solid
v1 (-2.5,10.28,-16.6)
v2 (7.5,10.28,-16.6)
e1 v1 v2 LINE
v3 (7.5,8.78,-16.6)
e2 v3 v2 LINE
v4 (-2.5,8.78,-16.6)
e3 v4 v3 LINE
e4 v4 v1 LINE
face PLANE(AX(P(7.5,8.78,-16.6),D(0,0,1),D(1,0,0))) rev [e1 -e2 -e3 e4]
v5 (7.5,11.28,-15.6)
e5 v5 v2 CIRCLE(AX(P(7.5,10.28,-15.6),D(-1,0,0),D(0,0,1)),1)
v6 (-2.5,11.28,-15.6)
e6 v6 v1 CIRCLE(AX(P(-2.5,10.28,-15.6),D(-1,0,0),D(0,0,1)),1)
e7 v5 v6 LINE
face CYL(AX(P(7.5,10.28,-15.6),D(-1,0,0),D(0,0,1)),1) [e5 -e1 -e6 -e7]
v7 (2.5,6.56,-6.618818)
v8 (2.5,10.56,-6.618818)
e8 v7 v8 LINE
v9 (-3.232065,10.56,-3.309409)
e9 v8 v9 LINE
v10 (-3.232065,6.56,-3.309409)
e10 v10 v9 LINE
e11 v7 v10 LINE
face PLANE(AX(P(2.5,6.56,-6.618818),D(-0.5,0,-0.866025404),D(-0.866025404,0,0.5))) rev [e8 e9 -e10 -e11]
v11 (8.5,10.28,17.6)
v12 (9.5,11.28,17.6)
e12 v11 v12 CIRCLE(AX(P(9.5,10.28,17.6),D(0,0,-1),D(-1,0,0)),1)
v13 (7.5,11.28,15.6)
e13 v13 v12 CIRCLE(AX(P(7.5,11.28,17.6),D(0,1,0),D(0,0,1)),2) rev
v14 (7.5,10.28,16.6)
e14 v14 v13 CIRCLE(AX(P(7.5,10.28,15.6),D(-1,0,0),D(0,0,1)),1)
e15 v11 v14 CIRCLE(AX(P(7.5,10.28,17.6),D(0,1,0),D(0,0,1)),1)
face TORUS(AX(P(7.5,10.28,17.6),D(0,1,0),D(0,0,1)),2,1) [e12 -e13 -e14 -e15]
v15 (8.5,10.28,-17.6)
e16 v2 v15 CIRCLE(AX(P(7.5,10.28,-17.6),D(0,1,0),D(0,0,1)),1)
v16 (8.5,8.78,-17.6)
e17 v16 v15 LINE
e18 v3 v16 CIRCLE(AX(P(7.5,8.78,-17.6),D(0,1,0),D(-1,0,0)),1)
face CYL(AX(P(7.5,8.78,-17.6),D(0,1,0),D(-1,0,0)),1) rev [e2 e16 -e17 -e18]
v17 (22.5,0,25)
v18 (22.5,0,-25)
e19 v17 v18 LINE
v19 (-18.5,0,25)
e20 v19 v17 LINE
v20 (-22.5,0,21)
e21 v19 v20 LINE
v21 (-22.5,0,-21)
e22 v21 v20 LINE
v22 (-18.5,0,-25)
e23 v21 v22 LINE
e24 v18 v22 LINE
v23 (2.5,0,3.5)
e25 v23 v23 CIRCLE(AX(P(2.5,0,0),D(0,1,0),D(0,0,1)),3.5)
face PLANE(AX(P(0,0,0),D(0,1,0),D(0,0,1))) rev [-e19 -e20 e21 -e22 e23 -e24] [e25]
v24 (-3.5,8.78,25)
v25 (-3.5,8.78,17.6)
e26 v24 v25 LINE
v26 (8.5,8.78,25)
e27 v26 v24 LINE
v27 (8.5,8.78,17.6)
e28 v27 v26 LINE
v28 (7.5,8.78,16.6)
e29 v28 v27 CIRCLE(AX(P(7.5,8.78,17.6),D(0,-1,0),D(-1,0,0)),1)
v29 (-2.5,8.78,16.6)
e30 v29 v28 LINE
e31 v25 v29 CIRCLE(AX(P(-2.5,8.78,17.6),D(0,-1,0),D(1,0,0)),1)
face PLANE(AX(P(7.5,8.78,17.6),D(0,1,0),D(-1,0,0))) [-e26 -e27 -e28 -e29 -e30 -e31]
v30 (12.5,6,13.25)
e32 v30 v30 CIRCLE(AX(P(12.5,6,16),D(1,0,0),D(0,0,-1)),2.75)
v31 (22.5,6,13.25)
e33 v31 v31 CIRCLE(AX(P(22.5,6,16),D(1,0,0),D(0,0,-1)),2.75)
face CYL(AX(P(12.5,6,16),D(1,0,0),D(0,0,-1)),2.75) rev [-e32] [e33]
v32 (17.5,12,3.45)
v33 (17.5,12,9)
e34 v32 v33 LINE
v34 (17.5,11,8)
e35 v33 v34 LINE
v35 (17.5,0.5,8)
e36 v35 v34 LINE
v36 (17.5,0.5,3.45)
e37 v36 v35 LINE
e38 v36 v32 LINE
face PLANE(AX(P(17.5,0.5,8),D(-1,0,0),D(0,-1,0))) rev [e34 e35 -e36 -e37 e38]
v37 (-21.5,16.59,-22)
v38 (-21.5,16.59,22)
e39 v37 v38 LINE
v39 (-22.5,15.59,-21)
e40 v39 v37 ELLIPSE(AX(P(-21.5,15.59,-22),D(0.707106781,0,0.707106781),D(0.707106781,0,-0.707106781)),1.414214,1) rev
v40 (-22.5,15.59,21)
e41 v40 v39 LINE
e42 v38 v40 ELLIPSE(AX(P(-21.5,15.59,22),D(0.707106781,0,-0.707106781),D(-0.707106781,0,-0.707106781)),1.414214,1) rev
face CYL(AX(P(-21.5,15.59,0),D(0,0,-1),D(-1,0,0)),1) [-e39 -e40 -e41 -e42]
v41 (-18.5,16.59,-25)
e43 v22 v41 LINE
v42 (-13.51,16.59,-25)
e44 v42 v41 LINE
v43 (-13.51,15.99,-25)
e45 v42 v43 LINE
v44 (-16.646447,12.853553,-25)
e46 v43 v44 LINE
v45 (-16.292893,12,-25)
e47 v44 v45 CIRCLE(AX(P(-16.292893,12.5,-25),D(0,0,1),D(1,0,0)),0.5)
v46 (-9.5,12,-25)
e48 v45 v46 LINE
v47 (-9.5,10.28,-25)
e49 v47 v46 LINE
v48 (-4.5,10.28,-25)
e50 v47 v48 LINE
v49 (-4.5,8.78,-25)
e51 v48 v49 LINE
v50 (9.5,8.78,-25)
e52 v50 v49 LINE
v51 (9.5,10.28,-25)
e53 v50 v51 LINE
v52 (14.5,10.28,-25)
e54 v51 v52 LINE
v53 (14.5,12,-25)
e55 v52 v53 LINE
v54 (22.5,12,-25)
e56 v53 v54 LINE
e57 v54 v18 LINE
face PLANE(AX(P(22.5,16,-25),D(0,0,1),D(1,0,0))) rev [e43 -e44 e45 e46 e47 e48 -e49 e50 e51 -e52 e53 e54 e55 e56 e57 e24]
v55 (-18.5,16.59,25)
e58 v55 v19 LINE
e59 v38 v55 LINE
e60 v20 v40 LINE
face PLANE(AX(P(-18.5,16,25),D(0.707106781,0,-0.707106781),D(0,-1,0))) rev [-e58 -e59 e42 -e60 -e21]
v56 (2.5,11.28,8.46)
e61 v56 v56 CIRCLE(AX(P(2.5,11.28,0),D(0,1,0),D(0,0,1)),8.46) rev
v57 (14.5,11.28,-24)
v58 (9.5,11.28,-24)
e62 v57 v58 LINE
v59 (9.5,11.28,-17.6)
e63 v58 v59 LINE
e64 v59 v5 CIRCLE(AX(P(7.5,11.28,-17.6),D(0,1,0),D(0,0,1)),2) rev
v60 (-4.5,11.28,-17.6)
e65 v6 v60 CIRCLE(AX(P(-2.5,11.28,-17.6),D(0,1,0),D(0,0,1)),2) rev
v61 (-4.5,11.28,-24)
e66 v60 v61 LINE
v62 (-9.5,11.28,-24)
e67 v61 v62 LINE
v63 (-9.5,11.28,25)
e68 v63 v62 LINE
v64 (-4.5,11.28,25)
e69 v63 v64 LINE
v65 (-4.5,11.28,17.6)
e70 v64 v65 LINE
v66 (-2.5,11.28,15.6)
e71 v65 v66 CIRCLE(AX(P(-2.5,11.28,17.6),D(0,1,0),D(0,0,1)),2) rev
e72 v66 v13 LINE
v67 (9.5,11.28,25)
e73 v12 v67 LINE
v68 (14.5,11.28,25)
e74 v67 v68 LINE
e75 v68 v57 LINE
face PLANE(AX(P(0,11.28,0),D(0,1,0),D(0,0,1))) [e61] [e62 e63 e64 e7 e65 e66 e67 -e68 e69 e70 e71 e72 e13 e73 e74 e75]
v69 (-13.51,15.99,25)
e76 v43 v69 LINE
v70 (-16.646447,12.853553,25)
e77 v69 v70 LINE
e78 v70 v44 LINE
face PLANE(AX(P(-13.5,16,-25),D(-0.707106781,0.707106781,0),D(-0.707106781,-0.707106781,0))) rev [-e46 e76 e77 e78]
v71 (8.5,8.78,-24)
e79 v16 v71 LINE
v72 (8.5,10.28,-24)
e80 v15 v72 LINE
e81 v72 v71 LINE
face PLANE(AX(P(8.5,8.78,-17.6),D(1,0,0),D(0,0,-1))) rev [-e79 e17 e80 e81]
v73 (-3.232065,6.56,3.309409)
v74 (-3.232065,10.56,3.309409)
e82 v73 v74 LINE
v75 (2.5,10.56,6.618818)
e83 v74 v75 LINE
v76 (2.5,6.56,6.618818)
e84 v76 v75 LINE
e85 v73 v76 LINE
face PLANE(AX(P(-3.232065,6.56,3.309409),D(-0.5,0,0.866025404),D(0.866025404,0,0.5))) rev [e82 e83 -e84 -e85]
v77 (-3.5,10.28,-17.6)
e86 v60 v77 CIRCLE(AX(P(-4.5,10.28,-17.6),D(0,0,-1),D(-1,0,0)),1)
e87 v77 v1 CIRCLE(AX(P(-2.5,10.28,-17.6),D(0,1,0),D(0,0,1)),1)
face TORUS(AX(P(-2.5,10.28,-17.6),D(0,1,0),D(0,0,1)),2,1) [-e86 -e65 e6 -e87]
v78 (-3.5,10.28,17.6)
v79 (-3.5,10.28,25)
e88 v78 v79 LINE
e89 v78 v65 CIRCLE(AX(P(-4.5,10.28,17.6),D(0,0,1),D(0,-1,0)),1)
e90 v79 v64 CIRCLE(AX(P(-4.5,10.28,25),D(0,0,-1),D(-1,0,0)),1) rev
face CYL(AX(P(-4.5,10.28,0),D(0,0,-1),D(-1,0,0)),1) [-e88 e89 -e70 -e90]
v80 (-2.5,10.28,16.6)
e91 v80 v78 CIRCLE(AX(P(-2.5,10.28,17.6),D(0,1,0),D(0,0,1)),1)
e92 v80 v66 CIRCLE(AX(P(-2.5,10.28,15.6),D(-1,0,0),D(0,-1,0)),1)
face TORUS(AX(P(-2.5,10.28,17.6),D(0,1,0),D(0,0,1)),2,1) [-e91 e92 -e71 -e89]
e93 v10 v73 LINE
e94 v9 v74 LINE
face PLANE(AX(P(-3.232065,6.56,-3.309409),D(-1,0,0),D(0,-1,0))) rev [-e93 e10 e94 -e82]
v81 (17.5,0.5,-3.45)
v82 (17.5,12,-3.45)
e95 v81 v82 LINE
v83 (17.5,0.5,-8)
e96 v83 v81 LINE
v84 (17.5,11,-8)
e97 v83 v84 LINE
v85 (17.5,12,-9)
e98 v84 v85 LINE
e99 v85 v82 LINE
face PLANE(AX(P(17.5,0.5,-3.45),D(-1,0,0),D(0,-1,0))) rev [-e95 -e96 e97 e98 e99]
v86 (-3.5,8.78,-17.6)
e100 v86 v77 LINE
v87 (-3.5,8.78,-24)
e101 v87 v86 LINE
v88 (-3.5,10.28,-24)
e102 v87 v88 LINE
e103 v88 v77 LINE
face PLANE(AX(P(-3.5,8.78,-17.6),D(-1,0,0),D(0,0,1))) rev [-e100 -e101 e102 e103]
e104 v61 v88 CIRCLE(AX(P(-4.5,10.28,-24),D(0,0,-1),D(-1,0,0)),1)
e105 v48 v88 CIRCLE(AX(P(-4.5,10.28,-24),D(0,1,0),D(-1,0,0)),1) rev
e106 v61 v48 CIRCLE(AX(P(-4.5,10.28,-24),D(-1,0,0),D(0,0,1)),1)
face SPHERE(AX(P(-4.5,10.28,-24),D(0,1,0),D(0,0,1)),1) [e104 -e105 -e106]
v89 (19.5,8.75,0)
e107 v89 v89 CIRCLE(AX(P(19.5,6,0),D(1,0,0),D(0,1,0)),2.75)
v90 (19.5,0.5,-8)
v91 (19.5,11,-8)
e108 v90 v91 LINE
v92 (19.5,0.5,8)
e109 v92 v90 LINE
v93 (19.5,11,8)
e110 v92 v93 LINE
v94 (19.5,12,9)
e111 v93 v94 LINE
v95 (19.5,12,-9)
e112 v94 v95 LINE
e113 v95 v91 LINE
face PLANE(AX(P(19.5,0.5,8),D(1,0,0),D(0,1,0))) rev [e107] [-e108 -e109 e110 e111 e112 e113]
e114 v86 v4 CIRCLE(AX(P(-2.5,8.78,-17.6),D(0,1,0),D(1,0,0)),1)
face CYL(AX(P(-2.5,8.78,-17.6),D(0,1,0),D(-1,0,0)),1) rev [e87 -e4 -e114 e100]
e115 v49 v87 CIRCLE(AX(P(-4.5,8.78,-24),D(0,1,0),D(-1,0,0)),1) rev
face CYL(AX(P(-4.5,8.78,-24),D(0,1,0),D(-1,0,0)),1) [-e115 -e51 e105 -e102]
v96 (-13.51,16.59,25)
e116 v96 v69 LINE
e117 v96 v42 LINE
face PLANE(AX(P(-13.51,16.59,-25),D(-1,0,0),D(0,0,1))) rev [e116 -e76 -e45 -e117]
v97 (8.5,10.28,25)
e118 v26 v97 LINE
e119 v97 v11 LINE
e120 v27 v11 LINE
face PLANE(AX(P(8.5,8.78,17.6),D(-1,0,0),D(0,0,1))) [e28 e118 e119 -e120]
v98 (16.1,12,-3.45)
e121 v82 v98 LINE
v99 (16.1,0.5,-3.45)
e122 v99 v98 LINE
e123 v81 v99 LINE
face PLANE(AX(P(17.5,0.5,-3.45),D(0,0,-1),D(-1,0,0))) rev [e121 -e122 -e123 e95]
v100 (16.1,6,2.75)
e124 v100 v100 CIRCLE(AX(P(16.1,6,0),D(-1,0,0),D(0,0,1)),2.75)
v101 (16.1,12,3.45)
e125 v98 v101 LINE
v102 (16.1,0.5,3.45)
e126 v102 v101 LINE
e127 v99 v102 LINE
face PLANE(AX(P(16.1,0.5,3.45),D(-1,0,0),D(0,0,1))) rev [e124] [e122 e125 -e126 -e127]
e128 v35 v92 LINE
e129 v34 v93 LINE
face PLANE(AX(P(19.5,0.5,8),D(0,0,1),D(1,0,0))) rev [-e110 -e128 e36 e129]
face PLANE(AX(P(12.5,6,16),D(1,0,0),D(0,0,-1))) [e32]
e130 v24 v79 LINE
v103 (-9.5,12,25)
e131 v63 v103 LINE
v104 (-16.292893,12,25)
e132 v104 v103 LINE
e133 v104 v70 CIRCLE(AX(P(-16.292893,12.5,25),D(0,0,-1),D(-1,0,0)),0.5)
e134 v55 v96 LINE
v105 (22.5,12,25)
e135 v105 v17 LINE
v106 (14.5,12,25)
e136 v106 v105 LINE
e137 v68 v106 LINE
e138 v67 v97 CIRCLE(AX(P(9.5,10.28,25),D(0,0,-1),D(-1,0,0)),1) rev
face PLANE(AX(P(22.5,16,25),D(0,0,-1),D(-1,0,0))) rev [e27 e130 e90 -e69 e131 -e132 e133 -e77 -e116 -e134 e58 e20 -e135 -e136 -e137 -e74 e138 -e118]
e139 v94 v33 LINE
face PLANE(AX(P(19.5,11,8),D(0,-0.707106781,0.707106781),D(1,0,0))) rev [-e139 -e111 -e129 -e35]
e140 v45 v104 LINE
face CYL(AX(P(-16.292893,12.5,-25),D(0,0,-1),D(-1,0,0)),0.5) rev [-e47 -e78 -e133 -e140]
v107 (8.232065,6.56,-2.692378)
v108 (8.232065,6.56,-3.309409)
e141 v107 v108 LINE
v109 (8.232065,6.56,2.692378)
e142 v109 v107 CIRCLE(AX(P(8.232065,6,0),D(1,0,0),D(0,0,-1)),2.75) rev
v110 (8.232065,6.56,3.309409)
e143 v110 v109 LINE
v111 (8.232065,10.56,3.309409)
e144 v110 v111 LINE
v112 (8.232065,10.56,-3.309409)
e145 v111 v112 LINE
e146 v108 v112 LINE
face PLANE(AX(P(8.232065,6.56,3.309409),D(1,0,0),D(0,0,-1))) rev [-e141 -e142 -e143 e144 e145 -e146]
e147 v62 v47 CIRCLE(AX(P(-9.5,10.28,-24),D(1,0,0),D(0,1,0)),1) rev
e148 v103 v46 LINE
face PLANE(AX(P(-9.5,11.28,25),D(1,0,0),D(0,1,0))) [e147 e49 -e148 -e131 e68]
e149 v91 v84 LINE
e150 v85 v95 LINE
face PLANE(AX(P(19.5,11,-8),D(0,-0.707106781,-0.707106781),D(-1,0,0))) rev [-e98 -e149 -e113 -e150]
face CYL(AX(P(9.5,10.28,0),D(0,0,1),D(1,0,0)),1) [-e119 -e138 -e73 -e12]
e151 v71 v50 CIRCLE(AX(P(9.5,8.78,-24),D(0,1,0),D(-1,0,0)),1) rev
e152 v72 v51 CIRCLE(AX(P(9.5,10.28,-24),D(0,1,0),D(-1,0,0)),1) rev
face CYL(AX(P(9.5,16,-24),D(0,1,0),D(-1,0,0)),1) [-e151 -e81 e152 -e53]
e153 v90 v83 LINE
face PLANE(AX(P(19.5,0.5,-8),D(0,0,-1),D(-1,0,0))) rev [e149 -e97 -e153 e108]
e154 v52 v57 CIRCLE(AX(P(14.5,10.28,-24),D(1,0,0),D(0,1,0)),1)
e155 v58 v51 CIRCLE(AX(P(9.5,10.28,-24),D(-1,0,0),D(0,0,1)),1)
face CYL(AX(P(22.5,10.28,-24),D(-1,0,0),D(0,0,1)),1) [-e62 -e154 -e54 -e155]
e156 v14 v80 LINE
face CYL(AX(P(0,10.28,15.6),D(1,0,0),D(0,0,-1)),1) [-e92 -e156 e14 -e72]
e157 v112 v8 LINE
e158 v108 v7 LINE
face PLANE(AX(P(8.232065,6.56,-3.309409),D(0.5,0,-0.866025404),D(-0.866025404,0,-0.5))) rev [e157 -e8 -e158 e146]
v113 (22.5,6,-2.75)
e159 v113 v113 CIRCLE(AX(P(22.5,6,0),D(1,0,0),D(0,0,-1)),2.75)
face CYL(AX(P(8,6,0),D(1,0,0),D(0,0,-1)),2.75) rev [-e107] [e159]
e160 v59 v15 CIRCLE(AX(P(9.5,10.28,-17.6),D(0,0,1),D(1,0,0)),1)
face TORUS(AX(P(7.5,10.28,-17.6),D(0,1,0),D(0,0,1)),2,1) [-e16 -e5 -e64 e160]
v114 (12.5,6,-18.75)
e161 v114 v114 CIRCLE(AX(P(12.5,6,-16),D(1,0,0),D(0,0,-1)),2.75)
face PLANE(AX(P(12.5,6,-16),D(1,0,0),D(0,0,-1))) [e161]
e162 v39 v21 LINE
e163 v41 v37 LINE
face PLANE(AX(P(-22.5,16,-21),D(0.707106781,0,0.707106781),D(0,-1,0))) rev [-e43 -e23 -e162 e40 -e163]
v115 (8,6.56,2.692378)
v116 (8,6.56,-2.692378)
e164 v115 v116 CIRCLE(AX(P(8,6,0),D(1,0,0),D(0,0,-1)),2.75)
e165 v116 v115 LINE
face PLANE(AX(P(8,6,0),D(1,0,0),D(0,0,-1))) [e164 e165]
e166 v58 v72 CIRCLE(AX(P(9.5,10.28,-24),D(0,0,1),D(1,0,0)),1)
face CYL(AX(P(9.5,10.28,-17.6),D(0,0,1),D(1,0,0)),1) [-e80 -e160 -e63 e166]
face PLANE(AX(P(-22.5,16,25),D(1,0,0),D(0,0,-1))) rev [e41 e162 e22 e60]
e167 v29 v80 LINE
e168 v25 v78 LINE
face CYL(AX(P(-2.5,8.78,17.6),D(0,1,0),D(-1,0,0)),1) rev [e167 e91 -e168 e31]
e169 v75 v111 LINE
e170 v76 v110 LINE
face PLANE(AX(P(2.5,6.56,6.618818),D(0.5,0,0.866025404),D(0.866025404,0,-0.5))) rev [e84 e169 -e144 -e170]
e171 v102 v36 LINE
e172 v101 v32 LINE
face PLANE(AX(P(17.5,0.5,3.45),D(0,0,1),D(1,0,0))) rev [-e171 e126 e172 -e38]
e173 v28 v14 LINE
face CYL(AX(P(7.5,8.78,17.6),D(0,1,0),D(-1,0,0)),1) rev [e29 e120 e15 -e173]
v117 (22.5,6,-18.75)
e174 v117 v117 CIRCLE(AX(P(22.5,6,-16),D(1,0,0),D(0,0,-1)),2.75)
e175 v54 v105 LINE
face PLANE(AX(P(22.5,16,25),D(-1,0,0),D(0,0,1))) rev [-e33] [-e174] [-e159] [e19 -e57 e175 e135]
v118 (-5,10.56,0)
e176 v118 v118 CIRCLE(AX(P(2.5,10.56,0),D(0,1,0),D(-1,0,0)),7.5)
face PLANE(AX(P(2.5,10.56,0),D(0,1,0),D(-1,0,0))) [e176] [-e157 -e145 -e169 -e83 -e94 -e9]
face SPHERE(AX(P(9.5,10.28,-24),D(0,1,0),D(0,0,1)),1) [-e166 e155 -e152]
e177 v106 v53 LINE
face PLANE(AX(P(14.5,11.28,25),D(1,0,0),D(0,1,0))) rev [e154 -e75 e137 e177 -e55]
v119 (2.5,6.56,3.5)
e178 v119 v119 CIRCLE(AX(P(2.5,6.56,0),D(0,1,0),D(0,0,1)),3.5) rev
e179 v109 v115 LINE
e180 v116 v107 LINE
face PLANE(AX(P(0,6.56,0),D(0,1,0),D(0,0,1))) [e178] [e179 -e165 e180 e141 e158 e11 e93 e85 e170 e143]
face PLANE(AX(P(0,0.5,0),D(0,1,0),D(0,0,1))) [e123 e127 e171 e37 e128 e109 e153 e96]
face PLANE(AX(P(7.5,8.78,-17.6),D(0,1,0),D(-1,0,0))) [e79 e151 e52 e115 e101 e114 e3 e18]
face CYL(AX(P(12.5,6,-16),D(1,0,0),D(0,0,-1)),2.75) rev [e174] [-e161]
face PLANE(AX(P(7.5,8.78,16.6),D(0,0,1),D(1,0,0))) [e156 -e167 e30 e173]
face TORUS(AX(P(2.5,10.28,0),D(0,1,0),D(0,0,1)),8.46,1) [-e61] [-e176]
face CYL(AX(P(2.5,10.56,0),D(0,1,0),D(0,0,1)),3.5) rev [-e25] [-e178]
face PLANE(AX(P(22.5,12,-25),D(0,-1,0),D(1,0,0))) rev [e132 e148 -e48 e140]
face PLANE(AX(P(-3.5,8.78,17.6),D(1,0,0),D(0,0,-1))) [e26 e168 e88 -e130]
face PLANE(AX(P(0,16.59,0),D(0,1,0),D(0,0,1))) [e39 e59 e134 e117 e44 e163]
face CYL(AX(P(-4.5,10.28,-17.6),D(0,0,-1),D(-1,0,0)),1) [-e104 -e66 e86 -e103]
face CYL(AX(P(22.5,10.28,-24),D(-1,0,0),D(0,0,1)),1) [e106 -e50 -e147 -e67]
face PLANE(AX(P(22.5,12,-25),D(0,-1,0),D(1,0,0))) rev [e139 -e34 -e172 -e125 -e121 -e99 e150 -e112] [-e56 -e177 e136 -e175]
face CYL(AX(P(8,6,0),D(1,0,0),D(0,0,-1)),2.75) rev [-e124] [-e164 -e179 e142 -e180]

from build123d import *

# Parameters (mm, degrees)
SKETCH1_W            = 45
SKETCH1_H            = 50
BOSS_EXTRUDE1_DEPTH  = 16
CUT_EXTRUDE1_DEPTH   = 58.116109812
SKETCH4_W            = 24
SKETCH4_H            = 50
CUT_EXTRUDE2_DEPTH   = 0.72
CUT_EXTRUDE3_DEPTH   = 58.116109812
SKETCH8_R            = 7.5
CUT_EXTRUDE4_DEPTH   = 0.72
M6_CLEARANCE_HOLE2_D = 7
CUT_EXTRUDE5_DEPTH   = 2.5
FILLET1_R            = 1
FILLET2_R            = 1
FILLET4_R            = 0.5
CUT_EXTRUDE7_DEPTH   = 11.5
SKETCH18_R           = 2.75
CUT_EXTRUDE8_DEPTH   = 14.5
SKETCH19_R           = 2.75
CUT_EXTRUDE9_DEPTH   = 10
SKETCH21_W           = 8.99
SKETCH21_H           = 50
BOSS_EXTRUDE2_DEPTH  = 0.6
CHAMFER1_SIZE        = 4
FILLET5_R            = 1
CUT_EXTRUDE11_DEPTH  = 4
CHAMFER2_SIZE        = 1


with BuildPart() as part:
    # Sketch1 → Boss-Extrude1 (new body)
    with BuildSketch(Plane(origin=(0, 0, 0), x_dir=(1, 0, 0), z_dir=(0, 1, 0))):
        Rectangle(SKETCH1_W, SKETCH1_H)
    extrude(amount=BOSS_EXTRUDE1_DEPTH)

    # Sketch3 → Cut-Extrude1 (cut, through all)
    with BuildSketch(Plane.XY.offset(25)):
        Polygon((-13.5, 16), (-17.5, 12), (22.5, 12), (22.5, 16), align=None)
    extrude(amount=-CUT_EXTRUDE1_DEPTH, mode=Mode.SUBTRACT)

    # Sketch4 → Cut-Extrude2 (cut)
    with BuildSketch(Plane(origin=(0, 12, 0), x_dir=(1, 0, 0), z_dir=(0, 1, 0))):
        with Locations((2.5, 0)):
            Rectangle(SKETCH4_W, SKETCH4_H)
    extrude(amount=-CUT_EXTRUDE2_DEPTH, mode=Mode.SUBTRACT)

    # Sketch5 → Cut-Extrude3 (cut, through all)
    with BuildSketch(Plane.XY.offset(25)):
        Polygon((-22.5, 16), (-13.5, 16), (-13.51, 15.99), (-22.5, 15.99), align=None)
    extrude(amount=-CUT_EXTRUDE3_DEPTH, mode=Mode.SUBTRACT)

    # Sketch8 → Cut-Extrude4 (cut)
    with BuildSketch(Plane(origin=(0, 11.28, 0), x_dir=(1, 0, 0), z_dir=(0, 1, 0))):
        with Locations(Location((2.5, 0, 0), (0, 0, 180))):
            Circle(SKETCH8_R)
    extrude(amount=-CUT_EXTRUDE4_DEPTH, mode=Mode.SUBTRACT)

    # M6 Clearance Hole2 (through all)
    with Locations(Plane(origin=(0, 10.56, 0), x_dir=(1, 0, 0), z_dir=(0, 1, 0))):
        with Locations((2.5, 0)):
            Hole(M6_CLEARANCE_HOLE2_D / 2)

    # Sketch12 → Cut-Extrude5 (cut)
    with BuildSketch(Plane(origin=(0, 11.28, 0), x_dir=(1, 0, 0), z_dir=(0, 1, 0))):
        with BuildLine():
            Line((7.5, 16.6), (-2.5, 16.6))
            ThreePointArc((-2.5, 16.6), (-3.207106781, 16.892893219), (-3.5, 17.6))
            Line((-3.5, 17.6), (-3.5, 25))
            Line((-3.5, 25), (8.5, 25))
            Line((8.5, 25), (8.5, 17.6))
            ThreePointArc((8.5, 17.6), (8.207106781, 16.892893219), (7.5, 16.6))
        make_face()
    cut_extrude5 = extrude(amount=-CUT_EXTRUDE5_DEPTH, mode=Mode.SUBTRACT)

    # Fillet1
    fillet1_edges = [part.edges().sort_by_distance(p)[0] for p in [
        (-3.5, 10.03, -25),
        (8.5, 10.03, -25),
    ]]
    fillet(fillet1_edges, radius=FILLET1_R)

    # Mirror2: Cut-Extrude5 across plane
    add(cut_extrude5.mirror(Plane.XY), mode=Mode.SUBTRACT)

    # Fillet2
    # the kernel refuses this fillet: 1 mm, written as the material it takes off along each edge
    with BuildSketch(Plane(origin=(7.5, 11.28, 17.6), x_dir=(1, 0, 0), z_dir=(0, 0, 1))) as fillet2_piece_1:
        with BuildLine():
            CenterArc((1 + FILLET2_R, -FILLET2_R), FILLET2_R, 90, 90)
            Line((1, -FILLET2_R), (1 - FILLET2_R * 0.02, -FILLET2_R))
            Line((1 - FILLET2_R * 0.02, -FILLET2_R), (1 - FILLET2_R * 0.02, FILLET2_R * 0.02))
            Line((1 - FILLET2_R * 0.02, FILLET2_R * 0.02), (1 + FILLET2_R, FILLET2_R * 0.02))
            Line((1 + FILLET2_R, FILLET2_R * 0.02), (1 + FILLET2_R, 0))
        make_face()
    revolve(axis=Axis((7.5, 11.28, 17.6), (0, 1, 0)), revolution_arc=90, mode=Mode.SUBTRACT)
    with BuildSketch(Plane(origin=(8.5, 11.28, 27.5), x_dir=(1, 0, 0), z_dir=(0, 0, -1)), Plane(origin=(-3.5, 11.28, 17.6), x_dir=(-1, 0, 0), z_dir=(0, 0, 1))) as fillet2_piece_2:
        with BuildLine():
            CenterArc((FILLET2_R, FILLET2_R), FILLET2_R, 180, 90)
            Line((0, FILLET2_R), (-FILLET2_R * 0.02, FILLET2_R))
            Line((-FILLET2_R * 0.02, FILLET2_R), (-FILLET2_R * 0.02, -FILLET2_R * 0.02))
            Line((-FILLET2_R * 0.02, -FILLET2_R * 0.02), (FILLET2_R, -FILLET2_R * 0.02))
            Line((FILLET2_R, -FILLET2_R * 0.02), (FILLET2_R, 0))
        make_face()
    extrude(amount=9.9, mode=Mode.SUBTRACT)
    with BuildSketch(Plane(origin=(-2.5, 11.28, 17.6), x_dir=(0, 0, -1), z_dir=(1, 0, 0))) as fillet2_piece_3:
        with BuildLine():
            CenterArc((1 + FILLET2_R, -FILLET2_R), FILLET2_R, 90, 90)
            Line((1, -FILLET2_R), (1 - FILLET2_R * 0.02, -FILLET2_R))
            Line((1 - FILLET2_R * 0.02, -FILLET2_R), (1 - FILLET2_R * 0.02, FILLET2_R * 0.02))
            Line((1 - FILLET2_R * 0.02, FILLET2_R * 0.02), (1 + FILLET2_R, FILLET2_R * 0.02))
            Line((1 + FILLET2_R, FILLET2_R * 0.02), (1 + FILLET2_R, 0))
        make_face()
    revolve(axis=Axis((-2.5, 11.28, 17.6), (0, 1, 0)), revolution_arc=90, mode=Mode.SUBTRACT)
    with BuildSketch(Plane(origin=(7.5, 11.28, 16.6), x_dir=(0, 0, -1), z_dir=(-1, 0, 0))) as fillet2_piece_4:
        with BuildLine():
            CenterArc((FILLET2_R, FILLET2_R), FILLET2_R, 180, 90)
            Line((0, FILLET2_R), (-FILLET2_R * 0.02, FILLET2_R))
            Line((-FILLET2_R * 0.02, FILLET2_R), (-FILLET2_R * 0.02, -FILLET2_R * 0.02))
            Line((-FILLET2_R * 0.02, -FILLET2_R * 0.02), (FILLET2_R, -FILLET2_R * 0.02))
            Line((FILLET2_R, -FILLET2_R * 0.02), (FILLET2_R, 0))
        make_face()
    extrude(amount=10, mode=Mode.SUBTRACT)
    with BuildSketch(Plane(origin=(-4.5, 11.28, -25), x_dir=(0, 0, 1), z_dir=(-1, 0, 0)), Plane(origin=(14.5, 11.28, -25), x_dir=(0, 0, 1), z_dir=(-1, 0, 0))) as fillet2_piece_5:
        with BuildLine():
            CenterArc((FILLET2_R, -FILLET2_R), FILLET2_R, 90, 90)
            Line((0, -FILLET2_R), (-FILLET2_R * 0.02, -FILLET2_R))
            Line((-FILLET2_R * 0.02, -FILLET2_R), (-FILLET2_R * 0.02, FILLET2_R * 0.02))
            Line((-FILLET2_R * 0.02, FILLET2_R * 0.02), (FILLET2_R, FILLET2_R * 0.02))
            Line((FILLET2_R, FILLET2_R * 0.02), (FILLET2_R, 0))
        make_face()
    extrude(amount=5, mode=Mode.SUBTRACT)
    with BuildSketch(Plane(origin=(2.5, 11.28, 0), x_dir=(-1, 0, 0), z_dir=(0, 0, -1))) as fillet2_piece_6:
        with BuildLine():
            CenterArc((8.46, -1), FILLET2_R, 90, 73.739795292)
            Line((7.5, -0.72), (7.4808, -0.7144))
            ThreePointArc((7.4808, -0.7144), (7.48, -0.36), (7.48, 0))
            Line((7.48, 0), (7.5, 0.02))
            Line((7.5, 0.02), (8.46, 0.02))
            Line((8.46, 0.02), (8.46, 0))
        make_face()
    revolve(axis=Axis((2.5, 11.28, 0), (0, 1, 0)), mode=Mode.SUBTRACT)
    with BuildSketch(Plane(origin=(7.5, 11.28, -17.6), x_dir=(1, 0, 0), z_dir=(0, 0, -1))) as fillet2_piece_7:
        with BuildLine():
            CenterArc((1 + FILLET2_R, FILLET2_R), FILLET2_R, 180, 90)
            Line((1, FILLET2_R), (1 - FILLET2_R * 0.02, FILLET2_R))
            Line((1 - FILLET2_R * 0.02, FILLET2_R), (1 - FILLET2_R * 0.02, -FILLET2_R * 0.02))
            Line((1 - FILLET2_R * 0.02, -FILLET2_R * 0.02), (1 + FILLET2_R, -FILLET2_R * 0.02))
            Line((1 + FILLET2_R, -FILLET2_R * 0.02), (1 + FILLET2_R, 0))
        make_face()
    revolve(axis=Axis((7.5, 11.28, -17.6), (0, -1, 0)), revolution_arc=90, mode=Mode.SUBTRACT)
    with BuildSketch(Plane(origin=(8.5, 11.28, -24), x_dir=(1, 0, 0), z_dir=(0, 0, 1)), Plane(origin=(-3.5, 11.28, -17.6), x_dir=(-1, 0, 0), z_dir=(0, 0, -1))) as fillet2_piece_8:
        with BuildLine():
            CenterArc((FILLET2_R, -FILLET2_R), FILLET2_R, 90, 90)
            Line((0, -FILLET2_R), (-FILLET2_R * 0.02, -FILLET2_R))
            Line((-FILLET2_R * 0.02, -FILLET2_R), (-FILLET2_R * 0.02, FILLET2_R * 0.02))
            Line((-FILLET2_R * 0.02, FILLET2_R * 0.02), (FILLET2_R, FILLET2_R * 0.02))
            Line((FILLET2_R, FILLET2_R * 0.02), (FILLET2_R, 0))
        make_face()
    extrude(amount=6.4, mode=Mode.SUBTRACT)
    with BuildSketch(Plane(origin=(-2.5, 11.28, -17.6), x_dir=(0, 0, 1), z_dir=(1, 0, 0))) as fillet2_piece_9:
        with BuildLine():
            CenterArc((1 + FILLET2_R, FILLET2_R), FILLET2_R, 180, 90)
            Line((1, FILLET2_R), (1 - FILLET2_R * 0.02, FILLET2_R))
            Line((1 - FILLET2_R * 0.02, FILLET2_R), (1 - FILLET2_R * 0.02, -FILLET2_R * 0.02))
            Line((1 - FILLET2_R * 0.02, -FILLET2_R * 0.02), (1 + FILLET2_R, -FILLET2_R * 0.02))
            Line((1 + FILLET2_R, -FILLET2_R * 0.02), (1 + FILLET2_R, 0))
        make_face()
    revolve(axis=Axis((-2.5, 11.28, -17.6), (0, -1, 0)), revolution_arc=90, mode=Mode.SUBTRACT)
    with BuildSketch(Plane(origin=(7.5, 11.28, -16.6), x_dir=(0, 0, 1), z_dir=(-1, 0, 0))) as fillet2_piece_10:
        with BuildLine():
            CenterArc((FILLET2_R, -FILLET2_R), FILLET2_R, 90, 90)
            Line((0, -FILLET2_R), (-FILLET2_R * 0.02, -FILLET2_R))
            Line((-FILLET2_R * 0.02, -FILLET2_R), (-FILLET2_R * 0.02, FILLET2_R * 0.02))
            Line((-FILLET2_R * 0.02, FILLET2_R * 0.02), (FILLET2_R, FILLET2_R * 0.02))
            Line((FILLET2_R, FILLET2_R * 0.02), (FILLET2_R, 0))
        make_face()
    extrude(amount=10, mode=Mode.SUBTRACT)
    with BuildSketch(Plane(origin=(-4.5, 11.28, -24), x_dir=(0, 0, -1), z_dir=(-1, 0, 0))) as fillet2_piece_11:
        with BuildLine():
            CenterArc((1 - FILLET2_R, FILLET2_R), FILLET2_R, 270, 90)
            Line((1, FILLET2_R), (1 + FILLET2_R * 0.02, FILLET2_R))
            Line((1 + FILLET2_R * 0.02, FILLET2_R), (1 + FILLET2_R * 0.02, 0))
            Line((1 + FILLET2_R * 0.02, 0), (1, -FILLET2_R * 0.02))
            Line((1, -FILLET2_R * 0.02), (1 - FILLET2_R, -FILLET2_R * 0.02))
            Line((1 - FILLET2_R, -FILLET2_R * 0.02), (1 - FILLET2_R, 0))
        make_face()
    revolve(axis=Axis((-4.5, 11.28, -24), (0, -1, 0)), revolution_arc=90, mode=Mode.SUBTRACT)
    with BuildSketch(Plane(origin=(9.5, 11.28, -24), x_dir=(0, 0, -1), z_dir=(1, 0, 0))) as fillet2_piece_12:
        with BuildLine():
            CenterArc((1 - FILLET2_R, -FILLET2_R), FILLET2_R, 0, 90)
            Line((1, -FILLET2_R), (1 + FILLET2_R * 0.02, -FILLET2_R))
            Line((1 + FILLET2_R * 0.02, -FILLET2_R), (1 + FILLET2_R * 0.02, 0))
            Line((1 + FILLET2_R * 0.02, 0), (1, FILLET2_R * 0.02))
            Line((1, FILLET2_R * 0.02), (1 - FILLET2_R, FILLET2_R * 0.02))
            Line((1 - FILLET2_R, FILLET2_R * 0.02), (1 - FILLET2_R, 0))
        make_face()
    revolve(axis=Axis((9.5, 11.28, -24), (0, 1, 0)), revolution_arc=90, mode=Mode.SUBTRACT)

    # Fillet4
    fillet4_edges = [part.edges().sort_by_distance(p)[0] for p in [
        (-17.5, 12, 0),
    ]]
    fillet(fillet4_edges, radius=FILLET4_R)

    # Sketch14 → Cut-Extrude7 (cut)
    with BuildSketch(Plane(origin=(0, 12, 0), x_dir=(1, 0, 0), z_dir=(0, 1, 0))):
        Polygon((19.5, -8), (17.5, -8), (17.5, -3.45), (16.1, -3.45), (16.1, 3.45), (17.5, 3.45), (17.5, 8), (19.5, 8), align=None)
    extrude(amount=-CUT_EXTRUDE7_DEPTH, mode=Mode.SUBTRACT)

    # Sketch18 → Cut-Extrude8 (cut)
    with BuildSketch(Plane(origin=(22.5, 0, 0), x_dir=(0, 0, -1), z_dir=(1, 0, 0))):
        with Locations((0, 6)):
            Circle(SKETCH18_R)
    extrude(amount=-CUT_EXTRUDE8_DEPTH, mode=Mode.SUBTRACT)

    # Sketch19 → Cut-Extrude9 (cut)
    with BuildSketch(Plane(origin=(22.5, 0, 0), x_dir=(0, 0, -1), z_dir=(1, 0, 0))):
        with Locations((-16, 6)):
            Circle(SKETCH19_R)
        with Locations((16, 6)):
            Circle(SKETCH19_R)
    extrude(amount=-CUT_EXTRUDE9_DEPTH, mode=Mode.SUBTRACT)

    # Sketch21 → Boss-Extrude2 (add)
    with BuildSketch(Plane(origin=(0, 15.99, 0), x_dir=(1, 0, 0), z_dir=(0, 1, 0))):
        with Locations((-18.005, 0)):
            Rectangle(SKETCH21_W, SKETCH21_H)
    extrude(amount=BOSS_EXTRUDE2_DEPTH)

    # Chamfer1
    chamfer1_edges = [part.edges().sort_by_distance(p)[0] for p in [
        (-22.5, 8.295, 25),
        (-22.5, 8.295, -25),
    ]]
    chamfer(chamfer1_edges, length=CHAMFER1_SIZE)

    # Fillet5
    fillet5_edges = [part.edges().sort_by_distance(p)[0] for p in [
        (-22.5, 16.59, 0),
    ]]
    fillet(fillet5_edges, radius=FILLET5_R)

    # Sketch23 → Cut-Extrude11 (cut)
    with BuildSketch(Plane(origin=(0, 10.56, 0), x_dir=(1, 0, 0), z_dir=(0, 1, 0))):
        Polygon((2.5, 6.618818118), (-3.232064633, 3.309409059), (-3.232064633, -3.309409059), (2.5, -6.618818118), (8.232064633, -3.309409059), (8.232064633, 3.309409059), align=None)
    extrude(amount=-CUT_EXTRUDE11_DEPTH, mode=Mode.SUBTRACT)

    # Chamfer2
    chamfer2_edges = [part.edges().sort_by_distance(p)[0] for p in [
        (18.5, 12, 8),
        (18.5, 12, -8),
    ]]
    chamfer(chamfer2_edges, length=CHAMFER2_SIZE)


solid = part.part
